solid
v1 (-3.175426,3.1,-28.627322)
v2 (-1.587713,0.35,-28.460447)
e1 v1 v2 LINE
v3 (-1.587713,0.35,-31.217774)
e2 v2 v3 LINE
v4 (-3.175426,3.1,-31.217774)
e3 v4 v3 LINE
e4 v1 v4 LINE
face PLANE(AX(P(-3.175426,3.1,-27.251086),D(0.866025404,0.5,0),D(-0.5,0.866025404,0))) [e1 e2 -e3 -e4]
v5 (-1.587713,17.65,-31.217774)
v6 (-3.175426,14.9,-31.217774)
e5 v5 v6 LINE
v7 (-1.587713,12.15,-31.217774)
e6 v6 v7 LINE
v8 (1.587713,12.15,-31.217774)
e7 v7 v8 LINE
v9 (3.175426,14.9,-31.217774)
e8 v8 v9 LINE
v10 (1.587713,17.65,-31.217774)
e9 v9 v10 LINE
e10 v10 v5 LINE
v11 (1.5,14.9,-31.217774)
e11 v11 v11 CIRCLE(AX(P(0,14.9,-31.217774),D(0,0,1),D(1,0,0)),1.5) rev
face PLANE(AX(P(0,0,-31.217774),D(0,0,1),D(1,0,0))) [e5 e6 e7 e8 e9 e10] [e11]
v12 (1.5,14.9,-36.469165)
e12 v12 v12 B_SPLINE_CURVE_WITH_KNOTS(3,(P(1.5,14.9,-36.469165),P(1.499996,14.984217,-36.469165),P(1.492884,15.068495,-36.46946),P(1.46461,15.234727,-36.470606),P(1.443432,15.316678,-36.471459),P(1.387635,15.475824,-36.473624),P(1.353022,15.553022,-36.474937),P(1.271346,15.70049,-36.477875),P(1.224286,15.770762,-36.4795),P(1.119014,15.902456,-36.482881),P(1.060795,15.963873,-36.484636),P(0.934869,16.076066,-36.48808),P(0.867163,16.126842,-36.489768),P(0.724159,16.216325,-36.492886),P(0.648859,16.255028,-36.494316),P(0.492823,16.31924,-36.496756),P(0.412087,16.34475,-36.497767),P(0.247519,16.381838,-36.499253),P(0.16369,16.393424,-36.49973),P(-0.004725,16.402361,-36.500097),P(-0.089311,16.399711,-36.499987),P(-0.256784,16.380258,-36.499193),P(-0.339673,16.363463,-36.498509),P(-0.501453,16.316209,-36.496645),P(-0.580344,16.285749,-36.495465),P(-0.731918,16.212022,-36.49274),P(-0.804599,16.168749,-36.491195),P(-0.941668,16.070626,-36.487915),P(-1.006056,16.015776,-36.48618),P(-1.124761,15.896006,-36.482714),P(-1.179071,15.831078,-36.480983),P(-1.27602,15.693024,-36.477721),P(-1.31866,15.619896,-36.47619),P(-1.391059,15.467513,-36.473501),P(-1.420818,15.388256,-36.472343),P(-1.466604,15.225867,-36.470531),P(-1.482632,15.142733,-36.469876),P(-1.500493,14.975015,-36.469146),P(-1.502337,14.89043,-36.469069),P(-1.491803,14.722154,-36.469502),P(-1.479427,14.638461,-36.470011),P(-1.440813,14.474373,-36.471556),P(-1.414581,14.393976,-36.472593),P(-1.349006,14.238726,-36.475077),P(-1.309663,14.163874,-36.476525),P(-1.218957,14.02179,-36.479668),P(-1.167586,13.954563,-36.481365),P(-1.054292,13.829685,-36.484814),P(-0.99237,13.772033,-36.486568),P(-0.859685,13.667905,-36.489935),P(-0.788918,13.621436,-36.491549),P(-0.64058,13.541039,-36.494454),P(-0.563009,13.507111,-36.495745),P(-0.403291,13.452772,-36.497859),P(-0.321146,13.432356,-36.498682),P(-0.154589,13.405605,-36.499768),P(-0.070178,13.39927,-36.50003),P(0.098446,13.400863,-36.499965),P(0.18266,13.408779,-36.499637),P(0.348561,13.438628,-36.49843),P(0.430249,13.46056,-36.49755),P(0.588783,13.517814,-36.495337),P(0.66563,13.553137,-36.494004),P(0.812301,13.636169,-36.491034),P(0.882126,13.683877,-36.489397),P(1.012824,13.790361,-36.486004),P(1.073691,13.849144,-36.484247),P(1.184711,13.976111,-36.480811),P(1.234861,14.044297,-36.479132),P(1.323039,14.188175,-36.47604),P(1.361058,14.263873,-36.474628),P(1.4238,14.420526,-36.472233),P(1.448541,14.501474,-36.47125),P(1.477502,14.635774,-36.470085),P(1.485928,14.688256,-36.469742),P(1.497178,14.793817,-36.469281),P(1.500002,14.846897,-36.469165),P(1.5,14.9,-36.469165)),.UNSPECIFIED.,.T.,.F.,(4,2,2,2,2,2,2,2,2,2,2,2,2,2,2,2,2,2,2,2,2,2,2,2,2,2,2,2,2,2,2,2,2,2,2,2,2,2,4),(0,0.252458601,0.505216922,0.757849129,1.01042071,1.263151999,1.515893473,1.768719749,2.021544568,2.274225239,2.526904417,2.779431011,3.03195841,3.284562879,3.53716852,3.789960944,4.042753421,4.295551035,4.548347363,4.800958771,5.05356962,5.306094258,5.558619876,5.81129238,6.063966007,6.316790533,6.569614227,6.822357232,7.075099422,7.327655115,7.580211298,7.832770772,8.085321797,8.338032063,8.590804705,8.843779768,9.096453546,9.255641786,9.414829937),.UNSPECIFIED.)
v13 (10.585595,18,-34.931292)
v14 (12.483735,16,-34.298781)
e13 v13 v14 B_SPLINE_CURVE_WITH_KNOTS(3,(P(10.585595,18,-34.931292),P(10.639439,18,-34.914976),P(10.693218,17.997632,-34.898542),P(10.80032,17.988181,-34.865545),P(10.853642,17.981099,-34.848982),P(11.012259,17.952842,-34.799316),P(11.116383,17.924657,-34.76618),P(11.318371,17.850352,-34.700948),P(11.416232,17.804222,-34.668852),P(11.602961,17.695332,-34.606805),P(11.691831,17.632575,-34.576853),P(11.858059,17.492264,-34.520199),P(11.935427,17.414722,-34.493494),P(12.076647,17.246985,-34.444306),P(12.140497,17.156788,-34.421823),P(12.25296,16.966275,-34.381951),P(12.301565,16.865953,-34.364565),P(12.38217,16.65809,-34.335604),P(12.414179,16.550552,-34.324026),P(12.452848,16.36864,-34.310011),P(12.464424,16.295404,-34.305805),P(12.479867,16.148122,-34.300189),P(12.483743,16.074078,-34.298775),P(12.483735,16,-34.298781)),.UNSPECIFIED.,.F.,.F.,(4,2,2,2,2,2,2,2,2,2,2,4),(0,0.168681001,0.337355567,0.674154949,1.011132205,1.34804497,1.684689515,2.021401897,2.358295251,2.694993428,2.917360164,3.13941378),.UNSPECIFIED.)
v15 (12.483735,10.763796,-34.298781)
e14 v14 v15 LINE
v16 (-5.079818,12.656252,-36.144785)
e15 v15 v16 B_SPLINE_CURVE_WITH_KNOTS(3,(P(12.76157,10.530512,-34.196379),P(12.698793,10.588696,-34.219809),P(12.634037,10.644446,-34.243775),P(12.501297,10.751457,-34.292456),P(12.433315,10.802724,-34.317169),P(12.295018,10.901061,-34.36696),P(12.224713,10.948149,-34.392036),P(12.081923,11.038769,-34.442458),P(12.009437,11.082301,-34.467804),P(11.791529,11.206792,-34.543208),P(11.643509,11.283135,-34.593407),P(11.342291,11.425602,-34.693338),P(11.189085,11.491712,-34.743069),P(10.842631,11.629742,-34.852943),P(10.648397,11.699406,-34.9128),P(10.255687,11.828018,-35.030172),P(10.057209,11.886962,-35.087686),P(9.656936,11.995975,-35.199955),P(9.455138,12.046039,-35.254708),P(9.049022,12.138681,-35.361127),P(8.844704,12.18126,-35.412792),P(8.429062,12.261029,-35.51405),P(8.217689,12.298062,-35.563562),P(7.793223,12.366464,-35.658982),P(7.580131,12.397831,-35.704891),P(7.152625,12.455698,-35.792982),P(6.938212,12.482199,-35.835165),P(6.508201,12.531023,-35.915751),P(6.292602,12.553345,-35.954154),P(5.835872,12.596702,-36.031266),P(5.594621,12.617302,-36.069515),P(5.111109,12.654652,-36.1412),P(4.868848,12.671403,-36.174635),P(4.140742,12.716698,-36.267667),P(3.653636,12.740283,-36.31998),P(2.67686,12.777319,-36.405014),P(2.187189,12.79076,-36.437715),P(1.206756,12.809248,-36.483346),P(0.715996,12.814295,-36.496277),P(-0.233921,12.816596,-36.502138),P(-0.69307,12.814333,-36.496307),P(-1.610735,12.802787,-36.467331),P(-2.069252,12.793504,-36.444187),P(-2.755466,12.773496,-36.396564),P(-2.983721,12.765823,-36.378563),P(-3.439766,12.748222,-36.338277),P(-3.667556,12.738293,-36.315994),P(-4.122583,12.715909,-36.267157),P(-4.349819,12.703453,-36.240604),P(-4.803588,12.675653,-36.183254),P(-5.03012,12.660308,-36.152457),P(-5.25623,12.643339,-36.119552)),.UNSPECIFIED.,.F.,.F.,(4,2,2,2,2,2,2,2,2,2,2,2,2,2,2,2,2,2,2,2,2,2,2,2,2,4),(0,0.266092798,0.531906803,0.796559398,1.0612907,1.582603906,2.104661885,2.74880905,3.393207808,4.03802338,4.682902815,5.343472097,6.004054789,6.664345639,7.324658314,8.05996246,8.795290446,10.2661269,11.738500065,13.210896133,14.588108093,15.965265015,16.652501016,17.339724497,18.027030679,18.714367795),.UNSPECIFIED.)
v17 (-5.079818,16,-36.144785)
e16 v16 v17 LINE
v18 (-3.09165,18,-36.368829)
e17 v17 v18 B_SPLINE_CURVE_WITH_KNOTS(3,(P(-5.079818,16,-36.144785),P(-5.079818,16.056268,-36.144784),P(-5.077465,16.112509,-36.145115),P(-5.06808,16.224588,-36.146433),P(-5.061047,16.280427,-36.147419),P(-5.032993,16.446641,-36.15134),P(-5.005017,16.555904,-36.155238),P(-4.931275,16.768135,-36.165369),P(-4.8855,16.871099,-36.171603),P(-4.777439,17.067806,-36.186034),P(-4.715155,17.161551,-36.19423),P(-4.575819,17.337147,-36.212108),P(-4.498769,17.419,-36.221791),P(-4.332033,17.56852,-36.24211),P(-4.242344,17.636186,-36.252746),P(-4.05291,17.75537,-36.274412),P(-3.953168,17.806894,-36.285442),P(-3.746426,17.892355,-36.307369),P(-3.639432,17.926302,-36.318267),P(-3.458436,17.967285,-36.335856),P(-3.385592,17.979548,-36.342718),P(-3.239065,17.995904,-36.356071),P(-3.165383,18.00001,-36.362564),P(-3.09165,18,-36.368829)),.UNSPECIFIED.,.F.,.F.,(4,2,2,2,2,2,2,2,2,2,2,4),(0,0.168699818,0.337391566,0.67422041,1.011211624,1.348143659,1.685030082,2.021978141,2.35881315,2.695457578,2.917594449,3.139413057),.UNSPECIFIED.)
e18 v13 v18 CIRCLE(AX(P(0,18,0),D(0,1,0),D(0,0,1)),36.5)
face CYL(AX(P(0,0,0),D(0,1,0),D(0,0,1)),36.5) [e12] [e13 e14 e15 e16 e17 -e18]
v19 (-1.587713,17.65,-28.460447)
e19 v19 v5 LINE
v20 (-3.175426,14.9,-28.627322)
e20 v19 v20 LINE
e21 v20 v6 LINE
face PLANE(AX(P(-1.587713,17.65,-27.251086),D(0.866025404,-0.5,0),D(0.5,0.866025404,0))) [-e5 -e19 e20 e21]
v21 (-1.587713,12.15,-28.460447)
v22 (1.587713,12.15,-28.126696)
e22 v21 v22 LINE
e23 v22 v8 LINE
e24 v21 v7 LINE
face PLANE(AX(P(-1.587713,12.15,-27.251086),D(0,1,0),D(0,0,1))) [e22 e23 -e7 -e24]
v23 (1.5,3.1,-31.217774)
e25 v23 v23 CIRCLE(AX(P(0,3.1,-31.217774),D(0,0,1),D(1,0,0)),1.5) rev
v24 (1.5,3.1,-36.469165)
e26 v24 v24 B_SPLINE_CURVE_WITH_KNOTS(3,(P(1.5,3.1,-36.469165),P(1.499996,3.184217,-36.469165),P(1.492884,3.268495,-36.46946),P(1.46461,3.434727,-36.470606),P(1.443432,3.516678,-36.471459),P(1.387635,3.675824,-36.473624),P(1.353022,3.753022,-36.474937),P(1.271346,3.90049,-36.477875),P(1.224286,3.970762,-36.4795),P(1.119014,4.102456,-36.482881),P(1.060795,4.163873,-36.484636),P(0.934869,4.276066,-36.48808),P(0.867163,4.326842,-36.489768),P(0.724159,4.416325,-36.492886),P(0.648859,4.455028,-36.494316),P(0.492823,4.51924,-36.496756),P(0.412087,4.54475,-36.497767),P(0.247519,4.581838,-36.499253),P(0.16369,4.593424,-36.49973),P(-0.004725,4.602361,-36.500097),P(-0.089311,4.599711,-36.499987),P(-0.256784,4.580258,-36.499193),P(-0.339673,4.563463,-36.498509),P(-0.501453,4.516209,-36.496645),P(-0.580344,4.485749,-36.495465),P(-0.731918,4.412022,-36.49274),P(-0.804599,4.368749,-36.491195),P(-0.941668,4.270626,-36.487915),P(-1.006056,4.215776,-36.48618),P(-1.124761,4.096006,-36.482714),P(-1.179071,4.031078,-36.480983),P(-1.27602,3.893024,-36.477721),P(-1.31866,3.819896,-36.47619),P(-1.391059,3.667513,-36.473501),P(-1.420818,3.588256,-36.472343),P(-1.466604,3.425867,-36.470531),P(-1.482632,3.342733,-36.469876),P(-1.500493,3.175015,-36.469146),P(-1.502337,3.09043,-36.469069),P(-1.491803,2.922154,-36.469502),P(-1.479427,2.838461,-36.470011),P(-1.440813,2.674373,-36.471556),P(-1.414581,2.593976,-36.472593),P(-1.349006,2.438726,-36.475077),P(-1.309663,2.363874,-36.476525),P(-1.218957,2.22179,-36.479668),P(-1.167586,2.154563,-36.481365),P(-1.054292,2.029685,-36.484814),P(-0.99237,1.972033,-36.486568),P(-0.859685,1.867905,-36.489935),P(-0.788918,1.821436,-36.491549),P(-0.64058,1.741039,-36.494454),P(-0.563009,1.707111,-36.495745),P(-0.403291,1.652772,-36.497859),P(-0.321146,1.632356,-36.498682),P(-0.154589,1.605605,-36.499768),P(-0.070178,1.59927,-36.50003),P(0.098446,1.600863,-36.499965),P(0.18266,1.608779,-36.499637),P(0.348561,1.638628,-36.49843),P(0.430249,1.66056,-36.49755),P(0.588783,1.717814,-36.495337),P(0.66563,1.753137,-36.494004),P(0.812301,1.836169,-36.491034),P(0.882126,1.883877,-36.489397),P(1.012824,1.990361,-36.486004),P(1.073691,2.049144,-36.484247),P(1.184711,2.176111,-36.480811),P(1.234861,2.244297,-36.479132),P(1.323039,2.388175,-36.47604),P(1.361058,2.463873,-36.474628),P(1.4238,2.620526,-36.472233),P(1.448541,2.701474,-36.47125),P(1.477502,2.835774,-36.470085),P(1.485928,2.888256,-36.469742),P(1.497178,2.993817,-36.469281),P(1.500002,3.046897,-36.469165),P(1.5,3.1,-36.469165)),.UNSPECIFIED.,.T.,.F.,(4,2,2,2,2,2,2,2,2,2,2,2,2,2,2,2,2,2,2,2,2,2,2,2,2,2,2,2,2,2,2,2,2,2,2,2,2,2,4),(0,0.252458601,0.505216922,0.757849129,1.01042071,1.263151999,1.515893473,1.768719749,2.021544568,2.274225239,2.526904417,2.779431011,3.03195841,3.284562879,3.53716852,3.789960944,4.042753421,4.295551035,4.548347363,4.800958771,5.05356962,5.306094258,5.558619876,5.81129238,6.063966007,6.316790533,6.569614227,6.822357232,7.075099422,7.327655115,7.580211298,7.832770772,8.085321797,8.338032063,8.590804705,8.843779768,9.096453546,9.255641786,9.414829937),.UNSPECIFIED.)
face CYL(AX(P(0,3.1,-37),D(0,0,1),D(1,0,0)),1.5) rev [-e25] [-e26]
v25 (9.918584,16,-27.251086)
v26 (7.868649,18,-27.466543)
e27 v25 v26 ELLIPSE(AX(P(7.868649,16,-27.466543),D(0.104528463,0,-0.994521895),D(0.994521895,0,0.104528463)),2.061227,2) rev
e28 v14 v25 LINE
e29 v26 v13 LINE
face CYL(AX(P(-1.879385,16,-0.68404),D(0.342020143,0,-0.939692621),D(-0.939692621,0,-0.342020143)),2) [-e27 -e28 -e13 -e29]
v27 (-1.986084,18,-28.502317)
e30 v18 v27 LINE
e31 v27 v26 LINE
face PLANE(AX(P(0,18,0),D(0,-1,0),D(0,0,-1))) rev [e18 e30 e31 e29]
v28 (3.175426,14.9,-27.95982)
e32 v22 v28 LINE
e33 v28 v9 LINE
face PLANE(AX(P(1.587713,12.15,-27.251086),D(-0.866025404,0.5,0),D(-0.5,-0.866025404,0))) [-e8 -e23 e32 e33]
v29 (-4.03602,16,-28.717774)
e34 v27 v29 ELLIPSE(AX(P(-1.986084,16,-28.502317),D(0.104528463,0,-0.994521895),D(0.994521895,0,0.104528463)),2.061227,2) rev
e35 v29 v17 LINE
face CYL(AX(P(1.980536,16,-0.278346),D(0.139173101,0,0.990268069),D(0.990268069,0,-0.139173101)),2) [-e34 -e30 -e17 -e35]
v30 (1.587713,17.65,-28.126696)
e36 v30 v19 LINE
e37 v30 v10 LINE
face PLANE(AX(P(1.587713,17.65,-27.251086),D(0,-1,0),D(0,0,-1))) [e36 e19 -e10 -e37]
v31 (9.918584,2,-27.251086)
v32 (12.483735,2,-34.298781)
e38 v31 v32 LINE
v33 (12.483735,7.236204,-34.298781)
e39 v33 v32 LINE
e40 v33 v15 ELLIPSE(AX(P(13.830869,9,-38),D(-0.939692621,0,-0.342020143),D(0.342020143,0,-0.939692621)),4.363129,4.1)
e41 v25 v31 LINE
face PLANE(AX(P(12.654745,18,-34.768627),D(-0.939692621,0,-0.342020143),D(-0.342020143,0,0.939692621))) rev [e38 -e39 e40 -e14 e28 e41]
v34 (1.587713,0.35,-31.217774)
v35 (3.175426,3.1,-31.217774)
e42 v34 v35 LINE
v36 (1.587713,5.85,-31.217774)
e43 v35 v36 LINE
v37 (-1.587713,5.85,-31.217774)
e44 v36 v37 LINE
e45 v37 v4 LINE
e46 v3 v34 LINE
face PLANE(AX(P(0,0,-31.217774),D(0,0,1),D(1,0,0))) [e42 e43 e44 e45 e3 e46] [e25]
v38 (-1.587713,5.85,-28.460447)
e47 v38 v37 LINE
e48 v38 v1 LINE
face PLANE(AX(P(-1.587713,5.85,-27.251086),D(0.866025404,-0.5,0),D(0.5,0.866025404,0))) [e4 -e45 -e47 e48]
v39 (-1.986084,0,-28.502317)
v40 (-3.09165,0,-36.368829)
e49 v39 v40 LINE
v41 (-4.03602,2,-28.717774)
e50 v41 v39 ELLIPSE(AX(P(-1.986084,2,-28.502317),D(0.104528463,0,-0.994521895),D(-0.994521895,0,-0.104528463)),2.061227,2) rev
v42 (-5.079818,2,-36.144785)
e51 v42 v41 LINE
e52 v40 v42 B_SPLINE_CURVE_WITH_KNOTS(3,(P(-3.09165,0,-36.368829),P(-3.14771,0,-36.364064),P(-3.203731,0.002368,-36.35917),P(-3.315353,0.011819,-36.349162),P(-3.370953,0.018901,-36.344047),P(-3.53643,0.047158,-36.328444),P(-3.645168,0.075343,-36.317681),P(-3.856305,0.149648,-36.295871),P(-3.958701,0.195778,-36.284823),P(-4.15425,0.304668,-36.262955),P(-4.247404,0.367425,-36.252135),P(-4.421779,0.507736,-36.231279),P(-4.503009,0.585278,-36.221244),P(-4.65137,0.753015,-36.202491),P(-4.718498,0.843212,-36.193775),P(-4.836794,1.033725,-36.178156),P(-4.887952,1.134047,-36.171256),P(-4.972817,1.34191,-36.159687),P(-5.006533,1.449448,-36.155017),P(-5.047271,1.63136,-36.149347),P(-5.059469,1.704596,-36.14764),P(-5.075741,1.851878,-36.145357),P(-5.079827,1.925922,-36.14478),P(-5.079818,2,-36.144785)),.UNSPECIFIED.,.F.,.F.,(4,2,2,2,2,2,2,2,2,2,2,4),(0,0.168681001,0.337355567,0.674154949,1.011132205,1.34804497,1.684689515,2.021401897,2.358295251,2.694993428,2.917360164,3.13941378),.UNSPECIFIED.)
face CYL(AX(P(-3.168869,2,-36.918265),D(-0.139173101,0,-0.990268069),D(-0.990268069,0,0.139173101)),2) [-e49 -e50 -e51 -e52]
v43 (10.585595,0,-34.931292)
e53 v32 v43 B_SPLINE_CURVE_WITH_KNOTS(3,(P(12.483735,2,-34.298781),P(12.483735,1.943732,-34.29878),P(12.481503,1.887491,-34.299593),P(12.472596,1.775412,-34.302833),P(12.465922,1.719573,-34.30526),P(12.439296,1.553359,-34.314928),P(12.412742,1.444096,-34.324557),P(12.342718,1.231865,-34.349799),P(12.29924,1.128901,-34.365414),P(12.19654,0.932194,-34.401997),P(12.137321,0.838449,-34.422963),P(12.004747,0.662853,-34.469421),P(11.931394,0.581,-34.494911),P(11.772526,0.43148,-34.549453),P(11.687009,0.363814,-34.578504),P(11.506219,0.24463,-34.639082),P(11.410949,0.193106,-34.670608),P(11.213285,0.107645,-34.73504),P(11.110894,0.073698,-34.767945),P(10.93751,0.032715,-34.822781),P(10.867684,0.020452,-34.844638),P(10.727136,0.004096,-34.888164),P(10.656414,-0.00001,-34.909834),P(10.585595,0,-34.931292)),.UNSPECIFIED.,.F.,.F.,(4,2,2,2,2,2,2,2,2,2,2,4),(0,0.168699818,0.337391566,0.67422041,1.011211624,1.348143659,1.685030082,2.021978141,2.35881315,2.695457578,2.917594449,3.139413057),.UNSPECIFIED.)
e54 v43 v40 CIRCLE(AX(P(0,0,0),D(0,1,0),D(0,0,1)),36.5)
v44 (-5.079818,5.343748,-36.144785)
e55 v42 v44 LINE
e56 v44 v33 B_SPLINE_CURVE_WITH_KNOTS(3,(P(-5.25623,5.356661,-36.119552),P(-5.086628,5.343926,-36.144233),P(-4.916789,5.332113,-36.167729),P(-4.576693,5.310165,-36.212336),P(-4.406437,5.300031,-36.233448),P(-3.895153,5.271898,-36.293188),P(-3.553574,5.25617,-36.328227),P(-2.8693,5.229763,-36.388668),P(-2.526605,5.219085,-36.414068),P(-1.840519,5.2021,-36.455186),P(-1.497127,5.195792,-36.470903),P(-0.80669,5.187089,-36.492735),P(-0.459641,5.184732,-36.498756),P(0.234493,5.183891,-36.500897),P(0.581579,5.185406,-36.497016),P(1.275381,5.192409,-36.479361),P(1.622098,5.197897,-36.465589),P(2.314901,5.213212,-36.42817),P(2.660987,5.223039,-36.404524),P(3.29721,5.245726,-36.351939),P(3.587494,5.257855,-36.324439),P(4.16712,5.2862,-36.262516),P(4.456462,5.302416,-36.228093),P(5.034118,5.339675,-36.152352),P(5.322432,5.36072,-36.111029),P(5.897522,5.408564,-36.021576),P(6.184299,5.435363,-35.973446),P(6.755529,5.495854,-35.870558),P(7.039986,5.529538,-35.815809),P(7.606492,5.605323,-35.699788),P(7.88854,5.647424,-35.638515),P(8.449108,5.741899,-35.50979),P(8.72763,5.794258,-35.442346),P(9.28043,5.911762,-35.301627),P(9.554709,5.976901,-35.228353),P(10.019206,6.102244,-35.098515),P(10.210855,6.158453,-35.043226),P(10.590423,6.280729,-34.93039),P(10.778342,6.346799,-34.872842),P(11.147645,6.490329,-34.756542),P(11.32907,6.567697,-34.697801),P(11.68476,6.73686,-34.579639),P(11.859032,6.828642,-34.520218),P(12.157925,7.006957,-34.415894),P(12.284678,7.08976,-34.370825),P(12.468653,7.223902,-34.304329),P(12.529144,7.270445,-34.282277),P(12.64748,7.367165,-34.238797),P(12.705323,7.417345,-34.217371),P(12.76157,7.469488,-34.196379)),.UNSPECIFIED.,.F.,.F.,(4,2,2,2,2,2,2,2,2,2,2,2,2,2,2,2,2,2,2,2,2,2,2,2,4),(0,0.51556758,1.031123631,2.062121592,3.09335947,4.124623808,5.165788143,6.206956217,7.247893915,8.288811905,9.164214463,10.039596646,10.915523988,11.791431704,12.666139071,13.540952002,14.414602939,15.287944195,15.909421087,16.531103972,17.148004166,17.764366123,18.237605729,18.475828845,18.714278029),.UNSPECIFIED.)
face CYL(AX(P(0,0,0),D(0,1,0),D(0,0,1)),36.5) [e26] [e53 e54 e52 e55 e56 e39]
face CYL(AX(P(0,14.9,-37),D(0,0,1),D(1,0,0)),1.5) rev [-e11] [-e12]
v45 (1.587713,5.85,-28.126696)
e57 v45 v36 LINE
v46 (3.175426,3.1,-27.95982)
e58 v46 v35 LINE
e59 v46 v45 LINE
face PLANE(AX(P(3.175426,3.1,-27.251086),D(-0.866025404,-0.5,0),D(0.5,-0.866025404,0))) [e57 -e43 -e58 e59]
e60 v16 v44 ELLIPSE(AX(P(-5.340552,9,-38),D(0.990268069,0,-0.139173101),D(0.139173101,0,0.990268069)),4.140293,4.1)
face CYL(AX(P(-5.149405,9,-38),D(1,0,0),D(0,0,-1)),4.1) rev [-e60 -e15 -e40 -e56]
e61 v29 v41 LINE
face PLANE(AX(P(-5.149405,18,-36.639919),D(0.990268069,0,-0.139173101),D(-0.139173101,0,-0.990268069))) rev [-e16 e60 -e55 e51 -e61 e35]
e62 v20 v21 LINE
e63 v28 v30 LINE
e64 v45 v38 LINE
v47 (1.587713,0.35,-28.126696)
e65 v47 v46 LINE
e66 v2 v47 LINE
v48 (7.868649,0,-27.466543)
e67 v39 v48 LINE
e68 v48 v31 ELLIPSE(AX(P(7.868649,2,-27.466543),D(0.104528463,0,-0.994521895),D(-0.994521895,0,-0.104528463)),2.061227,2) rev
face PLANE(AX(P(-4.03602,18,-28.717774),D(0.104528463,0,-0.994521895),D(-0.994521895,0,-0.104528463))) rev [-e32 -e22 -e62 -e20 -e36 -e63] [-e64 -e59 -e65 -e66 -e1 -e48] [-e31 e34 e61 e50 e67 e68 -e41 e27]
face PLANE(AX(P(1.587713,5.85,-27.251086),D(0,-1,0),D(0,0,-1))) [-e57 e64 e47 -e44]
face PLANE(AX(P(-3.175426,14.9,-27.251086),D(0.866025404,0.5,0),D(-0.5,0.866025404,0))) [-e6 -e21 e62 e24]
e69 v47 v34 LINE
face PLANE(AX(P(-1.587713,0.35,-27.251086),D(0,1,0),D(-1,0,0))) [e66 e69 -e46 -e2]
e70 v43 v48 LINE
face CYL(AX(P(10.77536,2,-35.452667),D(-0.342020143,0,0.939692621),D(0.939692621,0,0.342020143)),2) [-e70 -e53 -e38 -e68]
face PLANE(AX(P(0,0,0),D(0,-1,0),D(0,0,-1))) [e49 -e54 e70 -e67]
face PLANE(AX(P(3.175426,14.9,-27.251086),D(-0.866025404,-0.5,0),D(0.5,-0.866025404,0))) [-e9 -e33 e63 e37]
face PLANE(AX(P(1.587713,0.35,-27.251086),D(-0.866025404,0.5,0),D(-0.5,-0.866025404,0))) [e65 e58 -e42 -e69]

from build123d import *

# Parameters (mm, degrees)
BOSS_EXTRUDE1_DEPTH     = 18
CUT_EXTRUDE1_DEPTH      = 44.04814257
CUT_EXTRUDE1_DEPTH_BACK = 44.04814257
SKETCH5_R               = 1.5
CUT_EXTRUDE2_DEPTH      = 44.048142727
CUT_EXTRUDE3_START      = -18
CUT_EXTRUDE3_DEPTH      = 18
FILLET1_R               = 2
CUT_EXTRUDE4_DEPTH      = 24.246649109
CUT_EXTRUDE4_DEPTH_BACK = 2.5


# Read off the part's stored shape, not the designer's step: Cut-Extrude3
with BuildPart() as part:
    # Sketch2 → Boss-Extrude1 (new body)
    with BuildSketch(Plane(origin=(0, 0, 0), x_dir=(1, 0, 0), z_dir=(0, 1, 0))):
        with BuildLine():
            Line((12.654745303, 34.768626969), (9.918584156, 27.251086003))
            Line((9.918584156, 27.251086003), (-4.036019928, 28.717773994))
            Line((-4.036019928, 28.717773994), (-5.149404736, 36.639918543))
            ThreePointArc((-5.149404736, 36.639918543), (3.867553141, 36.797310129), (12.654745303, 34.768626969))
        make_face()
    extrude(amount=BOSS_EXTRUDE1_DEPTH)

    # Sketch3 → Cut-Extrude1 (cut, two sides: drawn at the far end of the back side and taken through both)
    with BuildSketch(Plane(origin=(0, 0, 0), x_dir=(0, 0, -1), z_dir=(1, 0, 0)).offset(-CUT_EXTRUDE1_DEPTH_BACK)):
        with BuildLine():
            Line((38, 13.1), (39.768626969, 13.1))
            Line((39.768626969, 13.1), (39.768626969, 4.9))
            Line((39.768626969, 4.9), (38, 4.9))
            ThreePointArc((38, 4.9), (33.9, 9), (38, 13.1))
        make_face()
    extrude(amount=CUT_EXTRUDE1_DEPTH + CUT_EXTRUDE1_DEPTH_BACK, mode=Mode.SUBTRACT)

    # Sketch5 → Cut-Extrude2 (cut, through all)
    with BuildSketch(Plane.XY):
        with Locations((0, 3.1)):
            Circle(SKETCH5_R)
        with Locations((0, 14.9)):
            Circle(SKETCH5_R)
    extrude(amount=-CUT_EXTRUDE2_DEPTH, mode=Mode.SUBTRACT)

    # Cut-Extrude3 outline → Cut-Extrude3 (cut)
    with BuildSketch(Plane(origin=(0, 18, 0), x_dir=(1, 0, 0), z_dir=(0, 1, 0)).offset(CUT_EXTRUDE3_START)):
        with BuildLine():
            ThreePointArc((-5.079818185, 36.144784509), (3.815289276, 36.300049142), (12.483735924, 34.298780407))
            Line((12.483735924, 34.298780407), (12.654745303, 34.768626969))
            ThreePointArc((12.654745303, 34.768626969), (3.867553141, 36.797310129), (-5.149404736, 36.639918543))
            Line((-5.149404736, 36.639918543), (-5.079818185, 36.144784509))
        make_face()
    extrude(amount=CUT_EXTRUDE3_DEPTH, mode=Mode.SUBTRACT)

    # Fillet1
    fillet1_edges = [part.edges().sort_by_distance(p)[0] for p in [
        (11.201159694, 18, -30.774933331),
        (11.201159694, 0, -30.774933331),
        (-4.557919056, 0, -32.431279251),
        (-4.557919056, 18, -32.431279251),
    ]]
    fillet(fillet1_edges, radius=FILLET1_R)

    # Sketch7 → Cut-Extrude4 (cut, two sides: drawn at the far end of the back side and taken through both)
    with BuildSketch(Plane.XY.offset(-28.717773994).offset(-CUT_EXTRUDE4_DEPTH_BACK)):
        Polygon((3.175426481, 14.9), (1.58771324, 17.65), (-1.58771324, 17.65), (-3.175426481, 14.9), (-1.58771324, 12.15), (1.58771324, 12.15), align=None)
        Polygon((3.175426481, 3.1), (1.58771324, 5.85), (-1.58771324, 5.85), (-3.175426481, 3.1), (-1.58771324, 0.35), (1.58771324, 0.35), align=None)
    extrude(amount=CUT_EXTRUDE4_DEPTH + CUT_EXTRUDE4_DEPTH_BACK, mode=Mode.SUBTRACT)


solid = part.part
